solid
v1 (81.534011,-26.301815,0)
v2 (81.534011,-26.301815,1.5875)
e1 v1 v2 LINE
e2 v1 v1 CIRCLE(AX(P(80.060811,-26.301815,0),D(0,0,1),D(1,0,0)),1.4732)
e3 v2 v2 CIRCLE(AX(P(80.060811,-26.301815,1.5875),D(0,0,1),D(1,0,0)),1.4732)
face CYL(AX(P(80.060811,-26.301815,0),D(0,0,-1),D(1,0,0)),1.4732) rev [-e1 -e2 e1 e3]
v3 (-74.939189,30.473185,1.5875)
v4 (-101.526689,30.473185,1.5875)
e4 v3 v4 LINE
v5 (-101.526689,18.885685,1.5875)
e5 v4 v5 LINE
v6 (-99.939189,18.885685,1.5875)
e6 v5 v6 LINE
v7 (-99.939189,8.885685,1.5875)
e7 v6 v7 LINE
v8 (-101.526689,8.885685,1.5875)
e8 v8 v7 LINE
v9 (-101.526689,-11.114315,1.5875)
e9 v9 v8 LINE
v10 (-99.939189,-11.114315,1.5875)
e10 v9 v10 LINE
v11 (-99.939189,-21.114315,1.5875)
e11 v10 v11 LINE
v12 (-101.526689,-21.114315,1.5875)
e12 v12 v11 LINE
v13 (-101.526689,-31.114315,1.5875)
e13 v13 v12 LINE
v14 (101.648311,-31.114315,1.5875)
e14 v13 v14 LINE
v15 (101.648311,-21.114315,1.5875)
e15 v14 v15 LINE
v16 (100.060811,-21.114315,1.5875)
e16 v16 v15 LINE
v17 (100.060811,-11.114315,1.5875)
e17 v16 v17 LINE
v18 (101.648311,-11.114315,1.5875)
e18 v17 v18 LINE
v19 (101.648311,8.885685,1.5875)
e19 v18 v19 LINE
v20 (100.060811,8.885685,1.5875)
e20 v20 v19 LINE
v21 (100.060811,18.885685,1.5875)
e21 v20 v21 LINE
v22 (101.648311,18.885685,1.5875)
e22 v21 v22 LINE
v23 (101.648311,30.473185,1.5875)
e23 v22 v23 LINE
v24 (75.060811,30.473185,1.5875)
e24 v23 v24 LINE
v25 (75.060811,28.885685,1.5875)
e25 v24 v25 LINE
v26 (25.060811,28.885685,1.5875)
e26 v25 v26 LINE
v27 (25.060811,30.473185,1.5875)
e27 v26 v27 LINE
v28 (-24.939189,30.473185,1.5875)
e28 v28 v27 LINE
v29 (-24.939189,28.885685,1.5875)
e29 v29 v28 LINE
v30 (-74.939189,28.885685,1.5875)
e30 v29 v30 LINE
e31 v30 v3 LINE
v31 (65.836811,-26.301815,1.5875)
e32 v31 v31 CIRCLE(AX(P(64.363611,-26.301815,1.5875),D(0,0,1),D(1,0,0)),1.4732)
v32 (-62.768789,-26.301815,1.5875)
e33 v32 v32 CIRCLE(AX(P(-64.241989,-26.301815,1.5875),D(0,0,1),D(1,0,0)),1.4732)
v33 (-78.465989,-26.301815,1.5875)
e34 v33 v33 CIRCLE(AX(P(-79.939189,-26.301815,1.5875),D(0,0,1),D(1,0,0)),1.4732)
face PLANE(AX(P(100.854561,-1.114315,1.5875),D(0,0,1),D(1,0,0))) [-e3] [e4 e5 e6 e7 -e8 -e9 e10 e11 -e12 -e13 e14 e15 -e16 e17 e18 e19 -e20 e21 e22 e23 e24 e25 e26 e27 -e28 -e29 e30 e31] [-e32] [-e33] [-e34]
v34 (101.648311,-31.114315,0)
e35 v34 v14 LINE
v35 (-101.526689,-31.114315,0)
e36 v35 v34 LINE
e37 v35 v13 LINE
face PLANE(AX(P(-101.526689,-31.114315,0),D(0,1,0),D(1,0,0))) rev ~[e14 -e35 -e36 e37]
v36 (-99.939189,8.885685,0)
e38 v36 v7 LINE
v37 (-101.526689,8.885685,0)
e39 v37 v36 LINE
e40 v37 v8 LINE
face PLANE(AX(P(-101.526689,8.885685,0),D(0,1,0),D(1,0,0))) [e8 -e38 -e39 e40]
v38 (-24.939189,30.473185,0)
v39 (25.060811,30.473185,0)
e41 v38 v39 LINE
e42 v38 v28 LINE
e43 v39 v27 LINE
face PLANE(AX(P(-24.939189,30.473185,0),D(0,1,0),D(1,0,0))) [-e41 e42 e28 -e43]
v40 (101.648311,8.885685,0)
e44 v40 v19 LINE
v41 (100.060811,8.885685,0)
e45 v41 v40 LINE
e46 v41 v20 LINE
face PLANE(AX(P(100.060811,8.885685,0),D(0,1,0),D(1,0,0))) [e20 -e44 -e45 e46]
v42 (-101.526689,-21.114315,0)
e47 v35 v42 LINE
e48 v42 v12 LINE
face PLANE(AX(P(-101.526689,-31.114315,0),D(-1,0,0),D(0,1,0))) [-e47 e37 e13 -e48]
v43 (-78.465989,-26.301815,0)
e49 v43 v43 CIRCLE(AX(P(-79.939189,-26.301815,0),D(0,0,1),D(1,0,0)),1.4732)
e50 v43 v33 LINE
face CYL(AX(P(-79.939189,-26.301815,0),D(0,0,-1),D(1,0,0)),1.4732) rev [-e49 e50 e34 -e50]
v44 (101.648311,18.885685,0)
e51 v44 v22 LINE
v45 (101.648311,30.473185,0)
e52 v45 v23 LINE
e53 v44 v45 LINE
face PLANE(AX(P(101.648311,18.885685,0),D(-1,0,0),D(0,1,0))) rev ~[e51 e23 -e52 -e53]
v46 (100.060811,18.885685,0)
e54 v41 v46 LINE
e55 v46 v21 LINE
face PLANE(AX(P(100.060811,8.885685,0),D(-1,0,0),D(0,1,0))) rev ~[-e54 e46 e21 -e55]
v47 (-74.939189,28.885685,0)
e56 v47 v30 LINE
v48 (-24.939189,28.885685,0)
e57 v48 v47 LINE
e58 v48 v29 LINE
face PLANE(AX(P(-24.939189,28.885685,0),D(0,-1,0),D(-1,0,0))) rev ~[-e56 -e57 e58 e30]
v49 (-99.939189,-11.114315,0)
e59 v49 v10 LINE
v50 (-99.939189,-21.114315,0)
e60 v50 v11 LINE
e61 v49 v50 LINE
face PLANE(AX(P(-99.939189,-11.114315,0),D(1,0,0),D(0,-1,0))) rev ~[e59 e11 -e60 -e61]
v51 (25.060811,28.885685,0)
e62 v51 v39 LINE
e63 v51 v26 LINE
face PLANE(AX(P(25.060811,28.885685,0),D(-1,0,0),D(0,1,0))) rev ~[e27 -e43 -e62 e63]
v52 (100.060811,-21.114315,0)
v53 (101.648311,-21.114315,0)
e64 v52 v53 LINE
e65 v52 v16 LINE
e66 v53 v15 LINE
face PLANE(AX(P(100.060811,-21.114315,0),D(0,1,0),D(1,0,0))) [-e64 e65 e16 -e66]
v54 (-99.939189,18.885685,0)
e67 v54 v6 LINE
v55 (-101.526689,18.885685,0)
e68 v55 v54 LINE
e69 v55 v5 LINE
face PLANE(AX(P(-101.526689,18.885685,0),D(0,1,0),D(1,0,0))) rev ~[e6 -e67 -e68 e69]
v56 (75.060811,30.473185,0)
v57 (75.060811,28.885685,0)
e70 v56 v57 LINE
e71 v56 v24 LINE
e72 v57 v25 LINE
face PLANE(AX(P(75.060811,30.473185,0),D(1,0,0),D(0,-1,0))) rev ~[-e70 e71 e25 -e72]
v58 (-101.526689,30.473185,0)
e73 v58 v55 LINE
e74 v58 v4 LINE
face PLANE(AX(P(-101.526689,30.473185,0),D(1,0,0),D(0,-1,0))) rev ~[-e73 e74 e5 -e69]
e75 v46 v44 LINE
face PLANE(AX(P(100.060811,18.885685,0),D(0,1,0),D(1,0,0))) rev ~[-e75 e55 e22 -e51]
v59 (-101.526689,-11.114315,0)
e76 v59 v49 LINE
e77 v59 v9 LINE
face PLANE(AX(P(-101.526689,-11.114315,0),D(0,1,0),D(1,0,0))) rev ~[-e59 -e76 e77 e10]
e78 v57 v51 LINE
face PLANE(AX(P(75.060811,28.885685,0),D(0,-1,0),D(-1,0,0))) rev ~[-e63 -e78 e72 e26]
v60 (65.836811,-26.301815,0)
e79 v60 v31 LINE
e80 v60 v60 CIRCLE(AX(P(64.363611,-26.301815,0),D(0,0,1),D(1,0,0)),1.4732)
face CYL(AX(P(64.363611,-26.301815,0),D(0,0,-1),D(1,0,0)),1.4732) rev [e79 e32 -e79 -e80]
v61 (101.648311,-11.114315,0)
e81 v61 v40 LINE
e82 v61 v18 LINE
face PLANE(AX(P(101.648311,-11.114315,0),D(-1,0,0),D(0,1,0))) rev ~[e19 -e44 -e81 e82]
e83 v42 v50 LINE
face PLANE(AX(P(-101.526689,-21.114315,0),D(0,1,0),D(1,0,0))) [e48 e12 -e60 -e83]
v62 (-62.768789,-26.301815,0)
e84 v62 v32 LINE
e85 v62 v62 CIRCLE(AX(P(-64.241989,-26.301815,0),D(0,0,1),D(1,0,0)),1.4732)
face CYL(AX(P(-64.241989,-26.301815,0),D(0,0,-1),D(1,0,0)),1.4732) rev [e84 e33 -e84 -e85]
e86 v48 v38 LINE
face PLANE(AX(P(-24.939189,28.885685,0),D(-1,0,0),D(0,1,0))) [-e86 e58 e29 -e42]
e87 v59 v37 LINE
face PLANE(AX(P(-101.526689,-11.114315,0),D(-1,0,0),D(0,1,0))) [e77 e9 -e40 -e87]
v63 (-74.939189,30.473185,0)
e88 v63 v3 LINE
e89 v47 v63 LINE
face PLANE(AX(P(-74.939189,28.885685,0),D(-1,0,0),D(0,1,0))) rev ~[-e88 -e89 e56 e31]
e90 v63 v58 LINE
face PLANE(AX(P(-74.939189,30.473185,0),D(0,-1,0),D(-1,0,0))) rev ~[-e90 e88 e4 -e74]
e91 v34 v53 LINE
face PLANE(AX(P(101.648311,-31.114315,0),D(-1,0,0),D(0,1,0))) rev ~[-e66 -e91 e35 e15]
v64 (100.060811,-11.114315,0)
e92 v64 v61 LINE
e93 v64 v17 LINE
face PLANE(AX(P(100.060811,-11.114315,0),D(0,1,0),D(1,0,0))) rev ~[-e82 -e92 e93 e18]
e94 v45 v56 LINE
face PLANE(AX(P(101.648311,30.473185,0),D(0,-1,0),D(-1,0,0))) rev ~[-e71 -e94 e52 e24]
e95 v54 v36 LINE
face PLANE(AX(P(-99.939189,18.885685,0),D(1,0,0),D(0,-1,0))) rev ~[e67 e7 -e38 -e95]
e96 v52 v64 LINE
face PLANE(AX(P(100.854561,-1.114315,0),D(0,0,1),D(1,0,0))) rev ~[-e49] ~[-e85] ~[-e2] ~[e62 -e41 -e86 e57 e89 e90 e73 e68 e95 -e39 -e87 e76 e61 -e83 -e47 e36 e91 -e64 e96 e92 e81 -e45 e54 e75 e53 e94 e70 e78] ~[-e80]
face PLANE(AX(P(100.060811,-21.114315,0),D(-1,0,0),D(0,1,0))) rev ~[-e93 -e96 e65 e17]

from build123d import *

# Parameters (mm, degrees)
F0_W     = 1.5875
F0_H     = 20
F0_H_2   = 10
F0_W_2   = 50
F0_H_3   = 1.5875
F0_W_3   = 200
F0_R     = 1.4732
F1_DEPTH = 1.5875


# Not quite as in the source:
# - a length typed as a fraction of an inch, garbled in the dataset ("3 / 203.2 mm" for 3/8 in), is restored


with BuildPart() as f1:
    # F0 (on Top) → F1 (new body)
    with BuildSketch(Plane.XY):
        with Locations((100.8545614919, -1.1143145161)):
            Rectangle(F0_W, F0_H)
        with Locations((-100.7329385081, -1.1143145161)):
            Rectangle(F0_W, F0_H)
        with Locations((-100.7329385081, -26.1143145161)):
            Rectangle(F0_W, F0_H_2)
        with Locations((100.8545614919, 23.8856854839)):
            Rectangle(F0_W, F0_H_2)
        with Locations((-100.7329385081, 23.8856854839)):
            Rectangle(F0_W, F0_H_2)
        with Locations((100.8545614919, -26.1143145161)):
            Rectangle(F0_W, F0_H_2)
        Polygon((75.0608114919, 28.8856854839), (100.0608114919, 28.8856854839), (101.6483114919, 28.8856854839), (101.6483114919, 30.4731854839), (75.0608114919, 30.4731854839), align=None)
        with Locations((0.0608114919, 29.6794354839)):
            Rectangle(F0_W_2, F0_H_3)
        Polygon((-101.5266885081, 28.8856854839), (-99.9391885081, 28.8856854839), (-74.9391885081, 28.8856854839), (-74.9391885081, 30.4731854839), (-101.5266885081, 30.4731854839), align=None)
        Polygon((100.0608114919, 8.8856854839), (100.0608114919, 18.8856854839), (-99.9391885081, 18.8856854839), (-99.9391885081, 8.8856854839), (-99.9391885081, -11.1143145161), (-99.9391885081, -21.1143145161), (100.0608114919, -21.1143145161), (100.0608114919, -11.1143145161), align=None)
        with Locations((0.0608114919, -26.1143145161)):
            Rectangle(F0_W_3, F0_H_2)
        with Locations((-79.9391885081, -26.3018145161)):
            Circle(F0_R, mode=Mode.SUBTRACT)
        with Locations((-64.2419885081, -26.3018145161)):
            Circle(F0_R, mode=Mode.SUBTRACT)
        with Locations((64.3636114919, -26.3018145161)):
            Circle(F0_R, mode=Mode.SUBTRACT)
        with Locations((80.0608114919, -26.3018145161)):
            Circle(F0_R, mode=Mode.SUBTRACT)
        Polygon((-99.9391885081, 18.8856854839), (100.0608114919, 18.8856854839), (100.0608114919, 28.8856854839), (75.0608114919, 28.8856854839), (25.0608114919, 28.8856854839), (-24.9391885081, 28.8856854839), (-74.9391885081, 28.8856854839), (-99.9391885081, 28.8856854839), align=None)
    extrude(amount=F1_DEPTH)


solid = f1.part
